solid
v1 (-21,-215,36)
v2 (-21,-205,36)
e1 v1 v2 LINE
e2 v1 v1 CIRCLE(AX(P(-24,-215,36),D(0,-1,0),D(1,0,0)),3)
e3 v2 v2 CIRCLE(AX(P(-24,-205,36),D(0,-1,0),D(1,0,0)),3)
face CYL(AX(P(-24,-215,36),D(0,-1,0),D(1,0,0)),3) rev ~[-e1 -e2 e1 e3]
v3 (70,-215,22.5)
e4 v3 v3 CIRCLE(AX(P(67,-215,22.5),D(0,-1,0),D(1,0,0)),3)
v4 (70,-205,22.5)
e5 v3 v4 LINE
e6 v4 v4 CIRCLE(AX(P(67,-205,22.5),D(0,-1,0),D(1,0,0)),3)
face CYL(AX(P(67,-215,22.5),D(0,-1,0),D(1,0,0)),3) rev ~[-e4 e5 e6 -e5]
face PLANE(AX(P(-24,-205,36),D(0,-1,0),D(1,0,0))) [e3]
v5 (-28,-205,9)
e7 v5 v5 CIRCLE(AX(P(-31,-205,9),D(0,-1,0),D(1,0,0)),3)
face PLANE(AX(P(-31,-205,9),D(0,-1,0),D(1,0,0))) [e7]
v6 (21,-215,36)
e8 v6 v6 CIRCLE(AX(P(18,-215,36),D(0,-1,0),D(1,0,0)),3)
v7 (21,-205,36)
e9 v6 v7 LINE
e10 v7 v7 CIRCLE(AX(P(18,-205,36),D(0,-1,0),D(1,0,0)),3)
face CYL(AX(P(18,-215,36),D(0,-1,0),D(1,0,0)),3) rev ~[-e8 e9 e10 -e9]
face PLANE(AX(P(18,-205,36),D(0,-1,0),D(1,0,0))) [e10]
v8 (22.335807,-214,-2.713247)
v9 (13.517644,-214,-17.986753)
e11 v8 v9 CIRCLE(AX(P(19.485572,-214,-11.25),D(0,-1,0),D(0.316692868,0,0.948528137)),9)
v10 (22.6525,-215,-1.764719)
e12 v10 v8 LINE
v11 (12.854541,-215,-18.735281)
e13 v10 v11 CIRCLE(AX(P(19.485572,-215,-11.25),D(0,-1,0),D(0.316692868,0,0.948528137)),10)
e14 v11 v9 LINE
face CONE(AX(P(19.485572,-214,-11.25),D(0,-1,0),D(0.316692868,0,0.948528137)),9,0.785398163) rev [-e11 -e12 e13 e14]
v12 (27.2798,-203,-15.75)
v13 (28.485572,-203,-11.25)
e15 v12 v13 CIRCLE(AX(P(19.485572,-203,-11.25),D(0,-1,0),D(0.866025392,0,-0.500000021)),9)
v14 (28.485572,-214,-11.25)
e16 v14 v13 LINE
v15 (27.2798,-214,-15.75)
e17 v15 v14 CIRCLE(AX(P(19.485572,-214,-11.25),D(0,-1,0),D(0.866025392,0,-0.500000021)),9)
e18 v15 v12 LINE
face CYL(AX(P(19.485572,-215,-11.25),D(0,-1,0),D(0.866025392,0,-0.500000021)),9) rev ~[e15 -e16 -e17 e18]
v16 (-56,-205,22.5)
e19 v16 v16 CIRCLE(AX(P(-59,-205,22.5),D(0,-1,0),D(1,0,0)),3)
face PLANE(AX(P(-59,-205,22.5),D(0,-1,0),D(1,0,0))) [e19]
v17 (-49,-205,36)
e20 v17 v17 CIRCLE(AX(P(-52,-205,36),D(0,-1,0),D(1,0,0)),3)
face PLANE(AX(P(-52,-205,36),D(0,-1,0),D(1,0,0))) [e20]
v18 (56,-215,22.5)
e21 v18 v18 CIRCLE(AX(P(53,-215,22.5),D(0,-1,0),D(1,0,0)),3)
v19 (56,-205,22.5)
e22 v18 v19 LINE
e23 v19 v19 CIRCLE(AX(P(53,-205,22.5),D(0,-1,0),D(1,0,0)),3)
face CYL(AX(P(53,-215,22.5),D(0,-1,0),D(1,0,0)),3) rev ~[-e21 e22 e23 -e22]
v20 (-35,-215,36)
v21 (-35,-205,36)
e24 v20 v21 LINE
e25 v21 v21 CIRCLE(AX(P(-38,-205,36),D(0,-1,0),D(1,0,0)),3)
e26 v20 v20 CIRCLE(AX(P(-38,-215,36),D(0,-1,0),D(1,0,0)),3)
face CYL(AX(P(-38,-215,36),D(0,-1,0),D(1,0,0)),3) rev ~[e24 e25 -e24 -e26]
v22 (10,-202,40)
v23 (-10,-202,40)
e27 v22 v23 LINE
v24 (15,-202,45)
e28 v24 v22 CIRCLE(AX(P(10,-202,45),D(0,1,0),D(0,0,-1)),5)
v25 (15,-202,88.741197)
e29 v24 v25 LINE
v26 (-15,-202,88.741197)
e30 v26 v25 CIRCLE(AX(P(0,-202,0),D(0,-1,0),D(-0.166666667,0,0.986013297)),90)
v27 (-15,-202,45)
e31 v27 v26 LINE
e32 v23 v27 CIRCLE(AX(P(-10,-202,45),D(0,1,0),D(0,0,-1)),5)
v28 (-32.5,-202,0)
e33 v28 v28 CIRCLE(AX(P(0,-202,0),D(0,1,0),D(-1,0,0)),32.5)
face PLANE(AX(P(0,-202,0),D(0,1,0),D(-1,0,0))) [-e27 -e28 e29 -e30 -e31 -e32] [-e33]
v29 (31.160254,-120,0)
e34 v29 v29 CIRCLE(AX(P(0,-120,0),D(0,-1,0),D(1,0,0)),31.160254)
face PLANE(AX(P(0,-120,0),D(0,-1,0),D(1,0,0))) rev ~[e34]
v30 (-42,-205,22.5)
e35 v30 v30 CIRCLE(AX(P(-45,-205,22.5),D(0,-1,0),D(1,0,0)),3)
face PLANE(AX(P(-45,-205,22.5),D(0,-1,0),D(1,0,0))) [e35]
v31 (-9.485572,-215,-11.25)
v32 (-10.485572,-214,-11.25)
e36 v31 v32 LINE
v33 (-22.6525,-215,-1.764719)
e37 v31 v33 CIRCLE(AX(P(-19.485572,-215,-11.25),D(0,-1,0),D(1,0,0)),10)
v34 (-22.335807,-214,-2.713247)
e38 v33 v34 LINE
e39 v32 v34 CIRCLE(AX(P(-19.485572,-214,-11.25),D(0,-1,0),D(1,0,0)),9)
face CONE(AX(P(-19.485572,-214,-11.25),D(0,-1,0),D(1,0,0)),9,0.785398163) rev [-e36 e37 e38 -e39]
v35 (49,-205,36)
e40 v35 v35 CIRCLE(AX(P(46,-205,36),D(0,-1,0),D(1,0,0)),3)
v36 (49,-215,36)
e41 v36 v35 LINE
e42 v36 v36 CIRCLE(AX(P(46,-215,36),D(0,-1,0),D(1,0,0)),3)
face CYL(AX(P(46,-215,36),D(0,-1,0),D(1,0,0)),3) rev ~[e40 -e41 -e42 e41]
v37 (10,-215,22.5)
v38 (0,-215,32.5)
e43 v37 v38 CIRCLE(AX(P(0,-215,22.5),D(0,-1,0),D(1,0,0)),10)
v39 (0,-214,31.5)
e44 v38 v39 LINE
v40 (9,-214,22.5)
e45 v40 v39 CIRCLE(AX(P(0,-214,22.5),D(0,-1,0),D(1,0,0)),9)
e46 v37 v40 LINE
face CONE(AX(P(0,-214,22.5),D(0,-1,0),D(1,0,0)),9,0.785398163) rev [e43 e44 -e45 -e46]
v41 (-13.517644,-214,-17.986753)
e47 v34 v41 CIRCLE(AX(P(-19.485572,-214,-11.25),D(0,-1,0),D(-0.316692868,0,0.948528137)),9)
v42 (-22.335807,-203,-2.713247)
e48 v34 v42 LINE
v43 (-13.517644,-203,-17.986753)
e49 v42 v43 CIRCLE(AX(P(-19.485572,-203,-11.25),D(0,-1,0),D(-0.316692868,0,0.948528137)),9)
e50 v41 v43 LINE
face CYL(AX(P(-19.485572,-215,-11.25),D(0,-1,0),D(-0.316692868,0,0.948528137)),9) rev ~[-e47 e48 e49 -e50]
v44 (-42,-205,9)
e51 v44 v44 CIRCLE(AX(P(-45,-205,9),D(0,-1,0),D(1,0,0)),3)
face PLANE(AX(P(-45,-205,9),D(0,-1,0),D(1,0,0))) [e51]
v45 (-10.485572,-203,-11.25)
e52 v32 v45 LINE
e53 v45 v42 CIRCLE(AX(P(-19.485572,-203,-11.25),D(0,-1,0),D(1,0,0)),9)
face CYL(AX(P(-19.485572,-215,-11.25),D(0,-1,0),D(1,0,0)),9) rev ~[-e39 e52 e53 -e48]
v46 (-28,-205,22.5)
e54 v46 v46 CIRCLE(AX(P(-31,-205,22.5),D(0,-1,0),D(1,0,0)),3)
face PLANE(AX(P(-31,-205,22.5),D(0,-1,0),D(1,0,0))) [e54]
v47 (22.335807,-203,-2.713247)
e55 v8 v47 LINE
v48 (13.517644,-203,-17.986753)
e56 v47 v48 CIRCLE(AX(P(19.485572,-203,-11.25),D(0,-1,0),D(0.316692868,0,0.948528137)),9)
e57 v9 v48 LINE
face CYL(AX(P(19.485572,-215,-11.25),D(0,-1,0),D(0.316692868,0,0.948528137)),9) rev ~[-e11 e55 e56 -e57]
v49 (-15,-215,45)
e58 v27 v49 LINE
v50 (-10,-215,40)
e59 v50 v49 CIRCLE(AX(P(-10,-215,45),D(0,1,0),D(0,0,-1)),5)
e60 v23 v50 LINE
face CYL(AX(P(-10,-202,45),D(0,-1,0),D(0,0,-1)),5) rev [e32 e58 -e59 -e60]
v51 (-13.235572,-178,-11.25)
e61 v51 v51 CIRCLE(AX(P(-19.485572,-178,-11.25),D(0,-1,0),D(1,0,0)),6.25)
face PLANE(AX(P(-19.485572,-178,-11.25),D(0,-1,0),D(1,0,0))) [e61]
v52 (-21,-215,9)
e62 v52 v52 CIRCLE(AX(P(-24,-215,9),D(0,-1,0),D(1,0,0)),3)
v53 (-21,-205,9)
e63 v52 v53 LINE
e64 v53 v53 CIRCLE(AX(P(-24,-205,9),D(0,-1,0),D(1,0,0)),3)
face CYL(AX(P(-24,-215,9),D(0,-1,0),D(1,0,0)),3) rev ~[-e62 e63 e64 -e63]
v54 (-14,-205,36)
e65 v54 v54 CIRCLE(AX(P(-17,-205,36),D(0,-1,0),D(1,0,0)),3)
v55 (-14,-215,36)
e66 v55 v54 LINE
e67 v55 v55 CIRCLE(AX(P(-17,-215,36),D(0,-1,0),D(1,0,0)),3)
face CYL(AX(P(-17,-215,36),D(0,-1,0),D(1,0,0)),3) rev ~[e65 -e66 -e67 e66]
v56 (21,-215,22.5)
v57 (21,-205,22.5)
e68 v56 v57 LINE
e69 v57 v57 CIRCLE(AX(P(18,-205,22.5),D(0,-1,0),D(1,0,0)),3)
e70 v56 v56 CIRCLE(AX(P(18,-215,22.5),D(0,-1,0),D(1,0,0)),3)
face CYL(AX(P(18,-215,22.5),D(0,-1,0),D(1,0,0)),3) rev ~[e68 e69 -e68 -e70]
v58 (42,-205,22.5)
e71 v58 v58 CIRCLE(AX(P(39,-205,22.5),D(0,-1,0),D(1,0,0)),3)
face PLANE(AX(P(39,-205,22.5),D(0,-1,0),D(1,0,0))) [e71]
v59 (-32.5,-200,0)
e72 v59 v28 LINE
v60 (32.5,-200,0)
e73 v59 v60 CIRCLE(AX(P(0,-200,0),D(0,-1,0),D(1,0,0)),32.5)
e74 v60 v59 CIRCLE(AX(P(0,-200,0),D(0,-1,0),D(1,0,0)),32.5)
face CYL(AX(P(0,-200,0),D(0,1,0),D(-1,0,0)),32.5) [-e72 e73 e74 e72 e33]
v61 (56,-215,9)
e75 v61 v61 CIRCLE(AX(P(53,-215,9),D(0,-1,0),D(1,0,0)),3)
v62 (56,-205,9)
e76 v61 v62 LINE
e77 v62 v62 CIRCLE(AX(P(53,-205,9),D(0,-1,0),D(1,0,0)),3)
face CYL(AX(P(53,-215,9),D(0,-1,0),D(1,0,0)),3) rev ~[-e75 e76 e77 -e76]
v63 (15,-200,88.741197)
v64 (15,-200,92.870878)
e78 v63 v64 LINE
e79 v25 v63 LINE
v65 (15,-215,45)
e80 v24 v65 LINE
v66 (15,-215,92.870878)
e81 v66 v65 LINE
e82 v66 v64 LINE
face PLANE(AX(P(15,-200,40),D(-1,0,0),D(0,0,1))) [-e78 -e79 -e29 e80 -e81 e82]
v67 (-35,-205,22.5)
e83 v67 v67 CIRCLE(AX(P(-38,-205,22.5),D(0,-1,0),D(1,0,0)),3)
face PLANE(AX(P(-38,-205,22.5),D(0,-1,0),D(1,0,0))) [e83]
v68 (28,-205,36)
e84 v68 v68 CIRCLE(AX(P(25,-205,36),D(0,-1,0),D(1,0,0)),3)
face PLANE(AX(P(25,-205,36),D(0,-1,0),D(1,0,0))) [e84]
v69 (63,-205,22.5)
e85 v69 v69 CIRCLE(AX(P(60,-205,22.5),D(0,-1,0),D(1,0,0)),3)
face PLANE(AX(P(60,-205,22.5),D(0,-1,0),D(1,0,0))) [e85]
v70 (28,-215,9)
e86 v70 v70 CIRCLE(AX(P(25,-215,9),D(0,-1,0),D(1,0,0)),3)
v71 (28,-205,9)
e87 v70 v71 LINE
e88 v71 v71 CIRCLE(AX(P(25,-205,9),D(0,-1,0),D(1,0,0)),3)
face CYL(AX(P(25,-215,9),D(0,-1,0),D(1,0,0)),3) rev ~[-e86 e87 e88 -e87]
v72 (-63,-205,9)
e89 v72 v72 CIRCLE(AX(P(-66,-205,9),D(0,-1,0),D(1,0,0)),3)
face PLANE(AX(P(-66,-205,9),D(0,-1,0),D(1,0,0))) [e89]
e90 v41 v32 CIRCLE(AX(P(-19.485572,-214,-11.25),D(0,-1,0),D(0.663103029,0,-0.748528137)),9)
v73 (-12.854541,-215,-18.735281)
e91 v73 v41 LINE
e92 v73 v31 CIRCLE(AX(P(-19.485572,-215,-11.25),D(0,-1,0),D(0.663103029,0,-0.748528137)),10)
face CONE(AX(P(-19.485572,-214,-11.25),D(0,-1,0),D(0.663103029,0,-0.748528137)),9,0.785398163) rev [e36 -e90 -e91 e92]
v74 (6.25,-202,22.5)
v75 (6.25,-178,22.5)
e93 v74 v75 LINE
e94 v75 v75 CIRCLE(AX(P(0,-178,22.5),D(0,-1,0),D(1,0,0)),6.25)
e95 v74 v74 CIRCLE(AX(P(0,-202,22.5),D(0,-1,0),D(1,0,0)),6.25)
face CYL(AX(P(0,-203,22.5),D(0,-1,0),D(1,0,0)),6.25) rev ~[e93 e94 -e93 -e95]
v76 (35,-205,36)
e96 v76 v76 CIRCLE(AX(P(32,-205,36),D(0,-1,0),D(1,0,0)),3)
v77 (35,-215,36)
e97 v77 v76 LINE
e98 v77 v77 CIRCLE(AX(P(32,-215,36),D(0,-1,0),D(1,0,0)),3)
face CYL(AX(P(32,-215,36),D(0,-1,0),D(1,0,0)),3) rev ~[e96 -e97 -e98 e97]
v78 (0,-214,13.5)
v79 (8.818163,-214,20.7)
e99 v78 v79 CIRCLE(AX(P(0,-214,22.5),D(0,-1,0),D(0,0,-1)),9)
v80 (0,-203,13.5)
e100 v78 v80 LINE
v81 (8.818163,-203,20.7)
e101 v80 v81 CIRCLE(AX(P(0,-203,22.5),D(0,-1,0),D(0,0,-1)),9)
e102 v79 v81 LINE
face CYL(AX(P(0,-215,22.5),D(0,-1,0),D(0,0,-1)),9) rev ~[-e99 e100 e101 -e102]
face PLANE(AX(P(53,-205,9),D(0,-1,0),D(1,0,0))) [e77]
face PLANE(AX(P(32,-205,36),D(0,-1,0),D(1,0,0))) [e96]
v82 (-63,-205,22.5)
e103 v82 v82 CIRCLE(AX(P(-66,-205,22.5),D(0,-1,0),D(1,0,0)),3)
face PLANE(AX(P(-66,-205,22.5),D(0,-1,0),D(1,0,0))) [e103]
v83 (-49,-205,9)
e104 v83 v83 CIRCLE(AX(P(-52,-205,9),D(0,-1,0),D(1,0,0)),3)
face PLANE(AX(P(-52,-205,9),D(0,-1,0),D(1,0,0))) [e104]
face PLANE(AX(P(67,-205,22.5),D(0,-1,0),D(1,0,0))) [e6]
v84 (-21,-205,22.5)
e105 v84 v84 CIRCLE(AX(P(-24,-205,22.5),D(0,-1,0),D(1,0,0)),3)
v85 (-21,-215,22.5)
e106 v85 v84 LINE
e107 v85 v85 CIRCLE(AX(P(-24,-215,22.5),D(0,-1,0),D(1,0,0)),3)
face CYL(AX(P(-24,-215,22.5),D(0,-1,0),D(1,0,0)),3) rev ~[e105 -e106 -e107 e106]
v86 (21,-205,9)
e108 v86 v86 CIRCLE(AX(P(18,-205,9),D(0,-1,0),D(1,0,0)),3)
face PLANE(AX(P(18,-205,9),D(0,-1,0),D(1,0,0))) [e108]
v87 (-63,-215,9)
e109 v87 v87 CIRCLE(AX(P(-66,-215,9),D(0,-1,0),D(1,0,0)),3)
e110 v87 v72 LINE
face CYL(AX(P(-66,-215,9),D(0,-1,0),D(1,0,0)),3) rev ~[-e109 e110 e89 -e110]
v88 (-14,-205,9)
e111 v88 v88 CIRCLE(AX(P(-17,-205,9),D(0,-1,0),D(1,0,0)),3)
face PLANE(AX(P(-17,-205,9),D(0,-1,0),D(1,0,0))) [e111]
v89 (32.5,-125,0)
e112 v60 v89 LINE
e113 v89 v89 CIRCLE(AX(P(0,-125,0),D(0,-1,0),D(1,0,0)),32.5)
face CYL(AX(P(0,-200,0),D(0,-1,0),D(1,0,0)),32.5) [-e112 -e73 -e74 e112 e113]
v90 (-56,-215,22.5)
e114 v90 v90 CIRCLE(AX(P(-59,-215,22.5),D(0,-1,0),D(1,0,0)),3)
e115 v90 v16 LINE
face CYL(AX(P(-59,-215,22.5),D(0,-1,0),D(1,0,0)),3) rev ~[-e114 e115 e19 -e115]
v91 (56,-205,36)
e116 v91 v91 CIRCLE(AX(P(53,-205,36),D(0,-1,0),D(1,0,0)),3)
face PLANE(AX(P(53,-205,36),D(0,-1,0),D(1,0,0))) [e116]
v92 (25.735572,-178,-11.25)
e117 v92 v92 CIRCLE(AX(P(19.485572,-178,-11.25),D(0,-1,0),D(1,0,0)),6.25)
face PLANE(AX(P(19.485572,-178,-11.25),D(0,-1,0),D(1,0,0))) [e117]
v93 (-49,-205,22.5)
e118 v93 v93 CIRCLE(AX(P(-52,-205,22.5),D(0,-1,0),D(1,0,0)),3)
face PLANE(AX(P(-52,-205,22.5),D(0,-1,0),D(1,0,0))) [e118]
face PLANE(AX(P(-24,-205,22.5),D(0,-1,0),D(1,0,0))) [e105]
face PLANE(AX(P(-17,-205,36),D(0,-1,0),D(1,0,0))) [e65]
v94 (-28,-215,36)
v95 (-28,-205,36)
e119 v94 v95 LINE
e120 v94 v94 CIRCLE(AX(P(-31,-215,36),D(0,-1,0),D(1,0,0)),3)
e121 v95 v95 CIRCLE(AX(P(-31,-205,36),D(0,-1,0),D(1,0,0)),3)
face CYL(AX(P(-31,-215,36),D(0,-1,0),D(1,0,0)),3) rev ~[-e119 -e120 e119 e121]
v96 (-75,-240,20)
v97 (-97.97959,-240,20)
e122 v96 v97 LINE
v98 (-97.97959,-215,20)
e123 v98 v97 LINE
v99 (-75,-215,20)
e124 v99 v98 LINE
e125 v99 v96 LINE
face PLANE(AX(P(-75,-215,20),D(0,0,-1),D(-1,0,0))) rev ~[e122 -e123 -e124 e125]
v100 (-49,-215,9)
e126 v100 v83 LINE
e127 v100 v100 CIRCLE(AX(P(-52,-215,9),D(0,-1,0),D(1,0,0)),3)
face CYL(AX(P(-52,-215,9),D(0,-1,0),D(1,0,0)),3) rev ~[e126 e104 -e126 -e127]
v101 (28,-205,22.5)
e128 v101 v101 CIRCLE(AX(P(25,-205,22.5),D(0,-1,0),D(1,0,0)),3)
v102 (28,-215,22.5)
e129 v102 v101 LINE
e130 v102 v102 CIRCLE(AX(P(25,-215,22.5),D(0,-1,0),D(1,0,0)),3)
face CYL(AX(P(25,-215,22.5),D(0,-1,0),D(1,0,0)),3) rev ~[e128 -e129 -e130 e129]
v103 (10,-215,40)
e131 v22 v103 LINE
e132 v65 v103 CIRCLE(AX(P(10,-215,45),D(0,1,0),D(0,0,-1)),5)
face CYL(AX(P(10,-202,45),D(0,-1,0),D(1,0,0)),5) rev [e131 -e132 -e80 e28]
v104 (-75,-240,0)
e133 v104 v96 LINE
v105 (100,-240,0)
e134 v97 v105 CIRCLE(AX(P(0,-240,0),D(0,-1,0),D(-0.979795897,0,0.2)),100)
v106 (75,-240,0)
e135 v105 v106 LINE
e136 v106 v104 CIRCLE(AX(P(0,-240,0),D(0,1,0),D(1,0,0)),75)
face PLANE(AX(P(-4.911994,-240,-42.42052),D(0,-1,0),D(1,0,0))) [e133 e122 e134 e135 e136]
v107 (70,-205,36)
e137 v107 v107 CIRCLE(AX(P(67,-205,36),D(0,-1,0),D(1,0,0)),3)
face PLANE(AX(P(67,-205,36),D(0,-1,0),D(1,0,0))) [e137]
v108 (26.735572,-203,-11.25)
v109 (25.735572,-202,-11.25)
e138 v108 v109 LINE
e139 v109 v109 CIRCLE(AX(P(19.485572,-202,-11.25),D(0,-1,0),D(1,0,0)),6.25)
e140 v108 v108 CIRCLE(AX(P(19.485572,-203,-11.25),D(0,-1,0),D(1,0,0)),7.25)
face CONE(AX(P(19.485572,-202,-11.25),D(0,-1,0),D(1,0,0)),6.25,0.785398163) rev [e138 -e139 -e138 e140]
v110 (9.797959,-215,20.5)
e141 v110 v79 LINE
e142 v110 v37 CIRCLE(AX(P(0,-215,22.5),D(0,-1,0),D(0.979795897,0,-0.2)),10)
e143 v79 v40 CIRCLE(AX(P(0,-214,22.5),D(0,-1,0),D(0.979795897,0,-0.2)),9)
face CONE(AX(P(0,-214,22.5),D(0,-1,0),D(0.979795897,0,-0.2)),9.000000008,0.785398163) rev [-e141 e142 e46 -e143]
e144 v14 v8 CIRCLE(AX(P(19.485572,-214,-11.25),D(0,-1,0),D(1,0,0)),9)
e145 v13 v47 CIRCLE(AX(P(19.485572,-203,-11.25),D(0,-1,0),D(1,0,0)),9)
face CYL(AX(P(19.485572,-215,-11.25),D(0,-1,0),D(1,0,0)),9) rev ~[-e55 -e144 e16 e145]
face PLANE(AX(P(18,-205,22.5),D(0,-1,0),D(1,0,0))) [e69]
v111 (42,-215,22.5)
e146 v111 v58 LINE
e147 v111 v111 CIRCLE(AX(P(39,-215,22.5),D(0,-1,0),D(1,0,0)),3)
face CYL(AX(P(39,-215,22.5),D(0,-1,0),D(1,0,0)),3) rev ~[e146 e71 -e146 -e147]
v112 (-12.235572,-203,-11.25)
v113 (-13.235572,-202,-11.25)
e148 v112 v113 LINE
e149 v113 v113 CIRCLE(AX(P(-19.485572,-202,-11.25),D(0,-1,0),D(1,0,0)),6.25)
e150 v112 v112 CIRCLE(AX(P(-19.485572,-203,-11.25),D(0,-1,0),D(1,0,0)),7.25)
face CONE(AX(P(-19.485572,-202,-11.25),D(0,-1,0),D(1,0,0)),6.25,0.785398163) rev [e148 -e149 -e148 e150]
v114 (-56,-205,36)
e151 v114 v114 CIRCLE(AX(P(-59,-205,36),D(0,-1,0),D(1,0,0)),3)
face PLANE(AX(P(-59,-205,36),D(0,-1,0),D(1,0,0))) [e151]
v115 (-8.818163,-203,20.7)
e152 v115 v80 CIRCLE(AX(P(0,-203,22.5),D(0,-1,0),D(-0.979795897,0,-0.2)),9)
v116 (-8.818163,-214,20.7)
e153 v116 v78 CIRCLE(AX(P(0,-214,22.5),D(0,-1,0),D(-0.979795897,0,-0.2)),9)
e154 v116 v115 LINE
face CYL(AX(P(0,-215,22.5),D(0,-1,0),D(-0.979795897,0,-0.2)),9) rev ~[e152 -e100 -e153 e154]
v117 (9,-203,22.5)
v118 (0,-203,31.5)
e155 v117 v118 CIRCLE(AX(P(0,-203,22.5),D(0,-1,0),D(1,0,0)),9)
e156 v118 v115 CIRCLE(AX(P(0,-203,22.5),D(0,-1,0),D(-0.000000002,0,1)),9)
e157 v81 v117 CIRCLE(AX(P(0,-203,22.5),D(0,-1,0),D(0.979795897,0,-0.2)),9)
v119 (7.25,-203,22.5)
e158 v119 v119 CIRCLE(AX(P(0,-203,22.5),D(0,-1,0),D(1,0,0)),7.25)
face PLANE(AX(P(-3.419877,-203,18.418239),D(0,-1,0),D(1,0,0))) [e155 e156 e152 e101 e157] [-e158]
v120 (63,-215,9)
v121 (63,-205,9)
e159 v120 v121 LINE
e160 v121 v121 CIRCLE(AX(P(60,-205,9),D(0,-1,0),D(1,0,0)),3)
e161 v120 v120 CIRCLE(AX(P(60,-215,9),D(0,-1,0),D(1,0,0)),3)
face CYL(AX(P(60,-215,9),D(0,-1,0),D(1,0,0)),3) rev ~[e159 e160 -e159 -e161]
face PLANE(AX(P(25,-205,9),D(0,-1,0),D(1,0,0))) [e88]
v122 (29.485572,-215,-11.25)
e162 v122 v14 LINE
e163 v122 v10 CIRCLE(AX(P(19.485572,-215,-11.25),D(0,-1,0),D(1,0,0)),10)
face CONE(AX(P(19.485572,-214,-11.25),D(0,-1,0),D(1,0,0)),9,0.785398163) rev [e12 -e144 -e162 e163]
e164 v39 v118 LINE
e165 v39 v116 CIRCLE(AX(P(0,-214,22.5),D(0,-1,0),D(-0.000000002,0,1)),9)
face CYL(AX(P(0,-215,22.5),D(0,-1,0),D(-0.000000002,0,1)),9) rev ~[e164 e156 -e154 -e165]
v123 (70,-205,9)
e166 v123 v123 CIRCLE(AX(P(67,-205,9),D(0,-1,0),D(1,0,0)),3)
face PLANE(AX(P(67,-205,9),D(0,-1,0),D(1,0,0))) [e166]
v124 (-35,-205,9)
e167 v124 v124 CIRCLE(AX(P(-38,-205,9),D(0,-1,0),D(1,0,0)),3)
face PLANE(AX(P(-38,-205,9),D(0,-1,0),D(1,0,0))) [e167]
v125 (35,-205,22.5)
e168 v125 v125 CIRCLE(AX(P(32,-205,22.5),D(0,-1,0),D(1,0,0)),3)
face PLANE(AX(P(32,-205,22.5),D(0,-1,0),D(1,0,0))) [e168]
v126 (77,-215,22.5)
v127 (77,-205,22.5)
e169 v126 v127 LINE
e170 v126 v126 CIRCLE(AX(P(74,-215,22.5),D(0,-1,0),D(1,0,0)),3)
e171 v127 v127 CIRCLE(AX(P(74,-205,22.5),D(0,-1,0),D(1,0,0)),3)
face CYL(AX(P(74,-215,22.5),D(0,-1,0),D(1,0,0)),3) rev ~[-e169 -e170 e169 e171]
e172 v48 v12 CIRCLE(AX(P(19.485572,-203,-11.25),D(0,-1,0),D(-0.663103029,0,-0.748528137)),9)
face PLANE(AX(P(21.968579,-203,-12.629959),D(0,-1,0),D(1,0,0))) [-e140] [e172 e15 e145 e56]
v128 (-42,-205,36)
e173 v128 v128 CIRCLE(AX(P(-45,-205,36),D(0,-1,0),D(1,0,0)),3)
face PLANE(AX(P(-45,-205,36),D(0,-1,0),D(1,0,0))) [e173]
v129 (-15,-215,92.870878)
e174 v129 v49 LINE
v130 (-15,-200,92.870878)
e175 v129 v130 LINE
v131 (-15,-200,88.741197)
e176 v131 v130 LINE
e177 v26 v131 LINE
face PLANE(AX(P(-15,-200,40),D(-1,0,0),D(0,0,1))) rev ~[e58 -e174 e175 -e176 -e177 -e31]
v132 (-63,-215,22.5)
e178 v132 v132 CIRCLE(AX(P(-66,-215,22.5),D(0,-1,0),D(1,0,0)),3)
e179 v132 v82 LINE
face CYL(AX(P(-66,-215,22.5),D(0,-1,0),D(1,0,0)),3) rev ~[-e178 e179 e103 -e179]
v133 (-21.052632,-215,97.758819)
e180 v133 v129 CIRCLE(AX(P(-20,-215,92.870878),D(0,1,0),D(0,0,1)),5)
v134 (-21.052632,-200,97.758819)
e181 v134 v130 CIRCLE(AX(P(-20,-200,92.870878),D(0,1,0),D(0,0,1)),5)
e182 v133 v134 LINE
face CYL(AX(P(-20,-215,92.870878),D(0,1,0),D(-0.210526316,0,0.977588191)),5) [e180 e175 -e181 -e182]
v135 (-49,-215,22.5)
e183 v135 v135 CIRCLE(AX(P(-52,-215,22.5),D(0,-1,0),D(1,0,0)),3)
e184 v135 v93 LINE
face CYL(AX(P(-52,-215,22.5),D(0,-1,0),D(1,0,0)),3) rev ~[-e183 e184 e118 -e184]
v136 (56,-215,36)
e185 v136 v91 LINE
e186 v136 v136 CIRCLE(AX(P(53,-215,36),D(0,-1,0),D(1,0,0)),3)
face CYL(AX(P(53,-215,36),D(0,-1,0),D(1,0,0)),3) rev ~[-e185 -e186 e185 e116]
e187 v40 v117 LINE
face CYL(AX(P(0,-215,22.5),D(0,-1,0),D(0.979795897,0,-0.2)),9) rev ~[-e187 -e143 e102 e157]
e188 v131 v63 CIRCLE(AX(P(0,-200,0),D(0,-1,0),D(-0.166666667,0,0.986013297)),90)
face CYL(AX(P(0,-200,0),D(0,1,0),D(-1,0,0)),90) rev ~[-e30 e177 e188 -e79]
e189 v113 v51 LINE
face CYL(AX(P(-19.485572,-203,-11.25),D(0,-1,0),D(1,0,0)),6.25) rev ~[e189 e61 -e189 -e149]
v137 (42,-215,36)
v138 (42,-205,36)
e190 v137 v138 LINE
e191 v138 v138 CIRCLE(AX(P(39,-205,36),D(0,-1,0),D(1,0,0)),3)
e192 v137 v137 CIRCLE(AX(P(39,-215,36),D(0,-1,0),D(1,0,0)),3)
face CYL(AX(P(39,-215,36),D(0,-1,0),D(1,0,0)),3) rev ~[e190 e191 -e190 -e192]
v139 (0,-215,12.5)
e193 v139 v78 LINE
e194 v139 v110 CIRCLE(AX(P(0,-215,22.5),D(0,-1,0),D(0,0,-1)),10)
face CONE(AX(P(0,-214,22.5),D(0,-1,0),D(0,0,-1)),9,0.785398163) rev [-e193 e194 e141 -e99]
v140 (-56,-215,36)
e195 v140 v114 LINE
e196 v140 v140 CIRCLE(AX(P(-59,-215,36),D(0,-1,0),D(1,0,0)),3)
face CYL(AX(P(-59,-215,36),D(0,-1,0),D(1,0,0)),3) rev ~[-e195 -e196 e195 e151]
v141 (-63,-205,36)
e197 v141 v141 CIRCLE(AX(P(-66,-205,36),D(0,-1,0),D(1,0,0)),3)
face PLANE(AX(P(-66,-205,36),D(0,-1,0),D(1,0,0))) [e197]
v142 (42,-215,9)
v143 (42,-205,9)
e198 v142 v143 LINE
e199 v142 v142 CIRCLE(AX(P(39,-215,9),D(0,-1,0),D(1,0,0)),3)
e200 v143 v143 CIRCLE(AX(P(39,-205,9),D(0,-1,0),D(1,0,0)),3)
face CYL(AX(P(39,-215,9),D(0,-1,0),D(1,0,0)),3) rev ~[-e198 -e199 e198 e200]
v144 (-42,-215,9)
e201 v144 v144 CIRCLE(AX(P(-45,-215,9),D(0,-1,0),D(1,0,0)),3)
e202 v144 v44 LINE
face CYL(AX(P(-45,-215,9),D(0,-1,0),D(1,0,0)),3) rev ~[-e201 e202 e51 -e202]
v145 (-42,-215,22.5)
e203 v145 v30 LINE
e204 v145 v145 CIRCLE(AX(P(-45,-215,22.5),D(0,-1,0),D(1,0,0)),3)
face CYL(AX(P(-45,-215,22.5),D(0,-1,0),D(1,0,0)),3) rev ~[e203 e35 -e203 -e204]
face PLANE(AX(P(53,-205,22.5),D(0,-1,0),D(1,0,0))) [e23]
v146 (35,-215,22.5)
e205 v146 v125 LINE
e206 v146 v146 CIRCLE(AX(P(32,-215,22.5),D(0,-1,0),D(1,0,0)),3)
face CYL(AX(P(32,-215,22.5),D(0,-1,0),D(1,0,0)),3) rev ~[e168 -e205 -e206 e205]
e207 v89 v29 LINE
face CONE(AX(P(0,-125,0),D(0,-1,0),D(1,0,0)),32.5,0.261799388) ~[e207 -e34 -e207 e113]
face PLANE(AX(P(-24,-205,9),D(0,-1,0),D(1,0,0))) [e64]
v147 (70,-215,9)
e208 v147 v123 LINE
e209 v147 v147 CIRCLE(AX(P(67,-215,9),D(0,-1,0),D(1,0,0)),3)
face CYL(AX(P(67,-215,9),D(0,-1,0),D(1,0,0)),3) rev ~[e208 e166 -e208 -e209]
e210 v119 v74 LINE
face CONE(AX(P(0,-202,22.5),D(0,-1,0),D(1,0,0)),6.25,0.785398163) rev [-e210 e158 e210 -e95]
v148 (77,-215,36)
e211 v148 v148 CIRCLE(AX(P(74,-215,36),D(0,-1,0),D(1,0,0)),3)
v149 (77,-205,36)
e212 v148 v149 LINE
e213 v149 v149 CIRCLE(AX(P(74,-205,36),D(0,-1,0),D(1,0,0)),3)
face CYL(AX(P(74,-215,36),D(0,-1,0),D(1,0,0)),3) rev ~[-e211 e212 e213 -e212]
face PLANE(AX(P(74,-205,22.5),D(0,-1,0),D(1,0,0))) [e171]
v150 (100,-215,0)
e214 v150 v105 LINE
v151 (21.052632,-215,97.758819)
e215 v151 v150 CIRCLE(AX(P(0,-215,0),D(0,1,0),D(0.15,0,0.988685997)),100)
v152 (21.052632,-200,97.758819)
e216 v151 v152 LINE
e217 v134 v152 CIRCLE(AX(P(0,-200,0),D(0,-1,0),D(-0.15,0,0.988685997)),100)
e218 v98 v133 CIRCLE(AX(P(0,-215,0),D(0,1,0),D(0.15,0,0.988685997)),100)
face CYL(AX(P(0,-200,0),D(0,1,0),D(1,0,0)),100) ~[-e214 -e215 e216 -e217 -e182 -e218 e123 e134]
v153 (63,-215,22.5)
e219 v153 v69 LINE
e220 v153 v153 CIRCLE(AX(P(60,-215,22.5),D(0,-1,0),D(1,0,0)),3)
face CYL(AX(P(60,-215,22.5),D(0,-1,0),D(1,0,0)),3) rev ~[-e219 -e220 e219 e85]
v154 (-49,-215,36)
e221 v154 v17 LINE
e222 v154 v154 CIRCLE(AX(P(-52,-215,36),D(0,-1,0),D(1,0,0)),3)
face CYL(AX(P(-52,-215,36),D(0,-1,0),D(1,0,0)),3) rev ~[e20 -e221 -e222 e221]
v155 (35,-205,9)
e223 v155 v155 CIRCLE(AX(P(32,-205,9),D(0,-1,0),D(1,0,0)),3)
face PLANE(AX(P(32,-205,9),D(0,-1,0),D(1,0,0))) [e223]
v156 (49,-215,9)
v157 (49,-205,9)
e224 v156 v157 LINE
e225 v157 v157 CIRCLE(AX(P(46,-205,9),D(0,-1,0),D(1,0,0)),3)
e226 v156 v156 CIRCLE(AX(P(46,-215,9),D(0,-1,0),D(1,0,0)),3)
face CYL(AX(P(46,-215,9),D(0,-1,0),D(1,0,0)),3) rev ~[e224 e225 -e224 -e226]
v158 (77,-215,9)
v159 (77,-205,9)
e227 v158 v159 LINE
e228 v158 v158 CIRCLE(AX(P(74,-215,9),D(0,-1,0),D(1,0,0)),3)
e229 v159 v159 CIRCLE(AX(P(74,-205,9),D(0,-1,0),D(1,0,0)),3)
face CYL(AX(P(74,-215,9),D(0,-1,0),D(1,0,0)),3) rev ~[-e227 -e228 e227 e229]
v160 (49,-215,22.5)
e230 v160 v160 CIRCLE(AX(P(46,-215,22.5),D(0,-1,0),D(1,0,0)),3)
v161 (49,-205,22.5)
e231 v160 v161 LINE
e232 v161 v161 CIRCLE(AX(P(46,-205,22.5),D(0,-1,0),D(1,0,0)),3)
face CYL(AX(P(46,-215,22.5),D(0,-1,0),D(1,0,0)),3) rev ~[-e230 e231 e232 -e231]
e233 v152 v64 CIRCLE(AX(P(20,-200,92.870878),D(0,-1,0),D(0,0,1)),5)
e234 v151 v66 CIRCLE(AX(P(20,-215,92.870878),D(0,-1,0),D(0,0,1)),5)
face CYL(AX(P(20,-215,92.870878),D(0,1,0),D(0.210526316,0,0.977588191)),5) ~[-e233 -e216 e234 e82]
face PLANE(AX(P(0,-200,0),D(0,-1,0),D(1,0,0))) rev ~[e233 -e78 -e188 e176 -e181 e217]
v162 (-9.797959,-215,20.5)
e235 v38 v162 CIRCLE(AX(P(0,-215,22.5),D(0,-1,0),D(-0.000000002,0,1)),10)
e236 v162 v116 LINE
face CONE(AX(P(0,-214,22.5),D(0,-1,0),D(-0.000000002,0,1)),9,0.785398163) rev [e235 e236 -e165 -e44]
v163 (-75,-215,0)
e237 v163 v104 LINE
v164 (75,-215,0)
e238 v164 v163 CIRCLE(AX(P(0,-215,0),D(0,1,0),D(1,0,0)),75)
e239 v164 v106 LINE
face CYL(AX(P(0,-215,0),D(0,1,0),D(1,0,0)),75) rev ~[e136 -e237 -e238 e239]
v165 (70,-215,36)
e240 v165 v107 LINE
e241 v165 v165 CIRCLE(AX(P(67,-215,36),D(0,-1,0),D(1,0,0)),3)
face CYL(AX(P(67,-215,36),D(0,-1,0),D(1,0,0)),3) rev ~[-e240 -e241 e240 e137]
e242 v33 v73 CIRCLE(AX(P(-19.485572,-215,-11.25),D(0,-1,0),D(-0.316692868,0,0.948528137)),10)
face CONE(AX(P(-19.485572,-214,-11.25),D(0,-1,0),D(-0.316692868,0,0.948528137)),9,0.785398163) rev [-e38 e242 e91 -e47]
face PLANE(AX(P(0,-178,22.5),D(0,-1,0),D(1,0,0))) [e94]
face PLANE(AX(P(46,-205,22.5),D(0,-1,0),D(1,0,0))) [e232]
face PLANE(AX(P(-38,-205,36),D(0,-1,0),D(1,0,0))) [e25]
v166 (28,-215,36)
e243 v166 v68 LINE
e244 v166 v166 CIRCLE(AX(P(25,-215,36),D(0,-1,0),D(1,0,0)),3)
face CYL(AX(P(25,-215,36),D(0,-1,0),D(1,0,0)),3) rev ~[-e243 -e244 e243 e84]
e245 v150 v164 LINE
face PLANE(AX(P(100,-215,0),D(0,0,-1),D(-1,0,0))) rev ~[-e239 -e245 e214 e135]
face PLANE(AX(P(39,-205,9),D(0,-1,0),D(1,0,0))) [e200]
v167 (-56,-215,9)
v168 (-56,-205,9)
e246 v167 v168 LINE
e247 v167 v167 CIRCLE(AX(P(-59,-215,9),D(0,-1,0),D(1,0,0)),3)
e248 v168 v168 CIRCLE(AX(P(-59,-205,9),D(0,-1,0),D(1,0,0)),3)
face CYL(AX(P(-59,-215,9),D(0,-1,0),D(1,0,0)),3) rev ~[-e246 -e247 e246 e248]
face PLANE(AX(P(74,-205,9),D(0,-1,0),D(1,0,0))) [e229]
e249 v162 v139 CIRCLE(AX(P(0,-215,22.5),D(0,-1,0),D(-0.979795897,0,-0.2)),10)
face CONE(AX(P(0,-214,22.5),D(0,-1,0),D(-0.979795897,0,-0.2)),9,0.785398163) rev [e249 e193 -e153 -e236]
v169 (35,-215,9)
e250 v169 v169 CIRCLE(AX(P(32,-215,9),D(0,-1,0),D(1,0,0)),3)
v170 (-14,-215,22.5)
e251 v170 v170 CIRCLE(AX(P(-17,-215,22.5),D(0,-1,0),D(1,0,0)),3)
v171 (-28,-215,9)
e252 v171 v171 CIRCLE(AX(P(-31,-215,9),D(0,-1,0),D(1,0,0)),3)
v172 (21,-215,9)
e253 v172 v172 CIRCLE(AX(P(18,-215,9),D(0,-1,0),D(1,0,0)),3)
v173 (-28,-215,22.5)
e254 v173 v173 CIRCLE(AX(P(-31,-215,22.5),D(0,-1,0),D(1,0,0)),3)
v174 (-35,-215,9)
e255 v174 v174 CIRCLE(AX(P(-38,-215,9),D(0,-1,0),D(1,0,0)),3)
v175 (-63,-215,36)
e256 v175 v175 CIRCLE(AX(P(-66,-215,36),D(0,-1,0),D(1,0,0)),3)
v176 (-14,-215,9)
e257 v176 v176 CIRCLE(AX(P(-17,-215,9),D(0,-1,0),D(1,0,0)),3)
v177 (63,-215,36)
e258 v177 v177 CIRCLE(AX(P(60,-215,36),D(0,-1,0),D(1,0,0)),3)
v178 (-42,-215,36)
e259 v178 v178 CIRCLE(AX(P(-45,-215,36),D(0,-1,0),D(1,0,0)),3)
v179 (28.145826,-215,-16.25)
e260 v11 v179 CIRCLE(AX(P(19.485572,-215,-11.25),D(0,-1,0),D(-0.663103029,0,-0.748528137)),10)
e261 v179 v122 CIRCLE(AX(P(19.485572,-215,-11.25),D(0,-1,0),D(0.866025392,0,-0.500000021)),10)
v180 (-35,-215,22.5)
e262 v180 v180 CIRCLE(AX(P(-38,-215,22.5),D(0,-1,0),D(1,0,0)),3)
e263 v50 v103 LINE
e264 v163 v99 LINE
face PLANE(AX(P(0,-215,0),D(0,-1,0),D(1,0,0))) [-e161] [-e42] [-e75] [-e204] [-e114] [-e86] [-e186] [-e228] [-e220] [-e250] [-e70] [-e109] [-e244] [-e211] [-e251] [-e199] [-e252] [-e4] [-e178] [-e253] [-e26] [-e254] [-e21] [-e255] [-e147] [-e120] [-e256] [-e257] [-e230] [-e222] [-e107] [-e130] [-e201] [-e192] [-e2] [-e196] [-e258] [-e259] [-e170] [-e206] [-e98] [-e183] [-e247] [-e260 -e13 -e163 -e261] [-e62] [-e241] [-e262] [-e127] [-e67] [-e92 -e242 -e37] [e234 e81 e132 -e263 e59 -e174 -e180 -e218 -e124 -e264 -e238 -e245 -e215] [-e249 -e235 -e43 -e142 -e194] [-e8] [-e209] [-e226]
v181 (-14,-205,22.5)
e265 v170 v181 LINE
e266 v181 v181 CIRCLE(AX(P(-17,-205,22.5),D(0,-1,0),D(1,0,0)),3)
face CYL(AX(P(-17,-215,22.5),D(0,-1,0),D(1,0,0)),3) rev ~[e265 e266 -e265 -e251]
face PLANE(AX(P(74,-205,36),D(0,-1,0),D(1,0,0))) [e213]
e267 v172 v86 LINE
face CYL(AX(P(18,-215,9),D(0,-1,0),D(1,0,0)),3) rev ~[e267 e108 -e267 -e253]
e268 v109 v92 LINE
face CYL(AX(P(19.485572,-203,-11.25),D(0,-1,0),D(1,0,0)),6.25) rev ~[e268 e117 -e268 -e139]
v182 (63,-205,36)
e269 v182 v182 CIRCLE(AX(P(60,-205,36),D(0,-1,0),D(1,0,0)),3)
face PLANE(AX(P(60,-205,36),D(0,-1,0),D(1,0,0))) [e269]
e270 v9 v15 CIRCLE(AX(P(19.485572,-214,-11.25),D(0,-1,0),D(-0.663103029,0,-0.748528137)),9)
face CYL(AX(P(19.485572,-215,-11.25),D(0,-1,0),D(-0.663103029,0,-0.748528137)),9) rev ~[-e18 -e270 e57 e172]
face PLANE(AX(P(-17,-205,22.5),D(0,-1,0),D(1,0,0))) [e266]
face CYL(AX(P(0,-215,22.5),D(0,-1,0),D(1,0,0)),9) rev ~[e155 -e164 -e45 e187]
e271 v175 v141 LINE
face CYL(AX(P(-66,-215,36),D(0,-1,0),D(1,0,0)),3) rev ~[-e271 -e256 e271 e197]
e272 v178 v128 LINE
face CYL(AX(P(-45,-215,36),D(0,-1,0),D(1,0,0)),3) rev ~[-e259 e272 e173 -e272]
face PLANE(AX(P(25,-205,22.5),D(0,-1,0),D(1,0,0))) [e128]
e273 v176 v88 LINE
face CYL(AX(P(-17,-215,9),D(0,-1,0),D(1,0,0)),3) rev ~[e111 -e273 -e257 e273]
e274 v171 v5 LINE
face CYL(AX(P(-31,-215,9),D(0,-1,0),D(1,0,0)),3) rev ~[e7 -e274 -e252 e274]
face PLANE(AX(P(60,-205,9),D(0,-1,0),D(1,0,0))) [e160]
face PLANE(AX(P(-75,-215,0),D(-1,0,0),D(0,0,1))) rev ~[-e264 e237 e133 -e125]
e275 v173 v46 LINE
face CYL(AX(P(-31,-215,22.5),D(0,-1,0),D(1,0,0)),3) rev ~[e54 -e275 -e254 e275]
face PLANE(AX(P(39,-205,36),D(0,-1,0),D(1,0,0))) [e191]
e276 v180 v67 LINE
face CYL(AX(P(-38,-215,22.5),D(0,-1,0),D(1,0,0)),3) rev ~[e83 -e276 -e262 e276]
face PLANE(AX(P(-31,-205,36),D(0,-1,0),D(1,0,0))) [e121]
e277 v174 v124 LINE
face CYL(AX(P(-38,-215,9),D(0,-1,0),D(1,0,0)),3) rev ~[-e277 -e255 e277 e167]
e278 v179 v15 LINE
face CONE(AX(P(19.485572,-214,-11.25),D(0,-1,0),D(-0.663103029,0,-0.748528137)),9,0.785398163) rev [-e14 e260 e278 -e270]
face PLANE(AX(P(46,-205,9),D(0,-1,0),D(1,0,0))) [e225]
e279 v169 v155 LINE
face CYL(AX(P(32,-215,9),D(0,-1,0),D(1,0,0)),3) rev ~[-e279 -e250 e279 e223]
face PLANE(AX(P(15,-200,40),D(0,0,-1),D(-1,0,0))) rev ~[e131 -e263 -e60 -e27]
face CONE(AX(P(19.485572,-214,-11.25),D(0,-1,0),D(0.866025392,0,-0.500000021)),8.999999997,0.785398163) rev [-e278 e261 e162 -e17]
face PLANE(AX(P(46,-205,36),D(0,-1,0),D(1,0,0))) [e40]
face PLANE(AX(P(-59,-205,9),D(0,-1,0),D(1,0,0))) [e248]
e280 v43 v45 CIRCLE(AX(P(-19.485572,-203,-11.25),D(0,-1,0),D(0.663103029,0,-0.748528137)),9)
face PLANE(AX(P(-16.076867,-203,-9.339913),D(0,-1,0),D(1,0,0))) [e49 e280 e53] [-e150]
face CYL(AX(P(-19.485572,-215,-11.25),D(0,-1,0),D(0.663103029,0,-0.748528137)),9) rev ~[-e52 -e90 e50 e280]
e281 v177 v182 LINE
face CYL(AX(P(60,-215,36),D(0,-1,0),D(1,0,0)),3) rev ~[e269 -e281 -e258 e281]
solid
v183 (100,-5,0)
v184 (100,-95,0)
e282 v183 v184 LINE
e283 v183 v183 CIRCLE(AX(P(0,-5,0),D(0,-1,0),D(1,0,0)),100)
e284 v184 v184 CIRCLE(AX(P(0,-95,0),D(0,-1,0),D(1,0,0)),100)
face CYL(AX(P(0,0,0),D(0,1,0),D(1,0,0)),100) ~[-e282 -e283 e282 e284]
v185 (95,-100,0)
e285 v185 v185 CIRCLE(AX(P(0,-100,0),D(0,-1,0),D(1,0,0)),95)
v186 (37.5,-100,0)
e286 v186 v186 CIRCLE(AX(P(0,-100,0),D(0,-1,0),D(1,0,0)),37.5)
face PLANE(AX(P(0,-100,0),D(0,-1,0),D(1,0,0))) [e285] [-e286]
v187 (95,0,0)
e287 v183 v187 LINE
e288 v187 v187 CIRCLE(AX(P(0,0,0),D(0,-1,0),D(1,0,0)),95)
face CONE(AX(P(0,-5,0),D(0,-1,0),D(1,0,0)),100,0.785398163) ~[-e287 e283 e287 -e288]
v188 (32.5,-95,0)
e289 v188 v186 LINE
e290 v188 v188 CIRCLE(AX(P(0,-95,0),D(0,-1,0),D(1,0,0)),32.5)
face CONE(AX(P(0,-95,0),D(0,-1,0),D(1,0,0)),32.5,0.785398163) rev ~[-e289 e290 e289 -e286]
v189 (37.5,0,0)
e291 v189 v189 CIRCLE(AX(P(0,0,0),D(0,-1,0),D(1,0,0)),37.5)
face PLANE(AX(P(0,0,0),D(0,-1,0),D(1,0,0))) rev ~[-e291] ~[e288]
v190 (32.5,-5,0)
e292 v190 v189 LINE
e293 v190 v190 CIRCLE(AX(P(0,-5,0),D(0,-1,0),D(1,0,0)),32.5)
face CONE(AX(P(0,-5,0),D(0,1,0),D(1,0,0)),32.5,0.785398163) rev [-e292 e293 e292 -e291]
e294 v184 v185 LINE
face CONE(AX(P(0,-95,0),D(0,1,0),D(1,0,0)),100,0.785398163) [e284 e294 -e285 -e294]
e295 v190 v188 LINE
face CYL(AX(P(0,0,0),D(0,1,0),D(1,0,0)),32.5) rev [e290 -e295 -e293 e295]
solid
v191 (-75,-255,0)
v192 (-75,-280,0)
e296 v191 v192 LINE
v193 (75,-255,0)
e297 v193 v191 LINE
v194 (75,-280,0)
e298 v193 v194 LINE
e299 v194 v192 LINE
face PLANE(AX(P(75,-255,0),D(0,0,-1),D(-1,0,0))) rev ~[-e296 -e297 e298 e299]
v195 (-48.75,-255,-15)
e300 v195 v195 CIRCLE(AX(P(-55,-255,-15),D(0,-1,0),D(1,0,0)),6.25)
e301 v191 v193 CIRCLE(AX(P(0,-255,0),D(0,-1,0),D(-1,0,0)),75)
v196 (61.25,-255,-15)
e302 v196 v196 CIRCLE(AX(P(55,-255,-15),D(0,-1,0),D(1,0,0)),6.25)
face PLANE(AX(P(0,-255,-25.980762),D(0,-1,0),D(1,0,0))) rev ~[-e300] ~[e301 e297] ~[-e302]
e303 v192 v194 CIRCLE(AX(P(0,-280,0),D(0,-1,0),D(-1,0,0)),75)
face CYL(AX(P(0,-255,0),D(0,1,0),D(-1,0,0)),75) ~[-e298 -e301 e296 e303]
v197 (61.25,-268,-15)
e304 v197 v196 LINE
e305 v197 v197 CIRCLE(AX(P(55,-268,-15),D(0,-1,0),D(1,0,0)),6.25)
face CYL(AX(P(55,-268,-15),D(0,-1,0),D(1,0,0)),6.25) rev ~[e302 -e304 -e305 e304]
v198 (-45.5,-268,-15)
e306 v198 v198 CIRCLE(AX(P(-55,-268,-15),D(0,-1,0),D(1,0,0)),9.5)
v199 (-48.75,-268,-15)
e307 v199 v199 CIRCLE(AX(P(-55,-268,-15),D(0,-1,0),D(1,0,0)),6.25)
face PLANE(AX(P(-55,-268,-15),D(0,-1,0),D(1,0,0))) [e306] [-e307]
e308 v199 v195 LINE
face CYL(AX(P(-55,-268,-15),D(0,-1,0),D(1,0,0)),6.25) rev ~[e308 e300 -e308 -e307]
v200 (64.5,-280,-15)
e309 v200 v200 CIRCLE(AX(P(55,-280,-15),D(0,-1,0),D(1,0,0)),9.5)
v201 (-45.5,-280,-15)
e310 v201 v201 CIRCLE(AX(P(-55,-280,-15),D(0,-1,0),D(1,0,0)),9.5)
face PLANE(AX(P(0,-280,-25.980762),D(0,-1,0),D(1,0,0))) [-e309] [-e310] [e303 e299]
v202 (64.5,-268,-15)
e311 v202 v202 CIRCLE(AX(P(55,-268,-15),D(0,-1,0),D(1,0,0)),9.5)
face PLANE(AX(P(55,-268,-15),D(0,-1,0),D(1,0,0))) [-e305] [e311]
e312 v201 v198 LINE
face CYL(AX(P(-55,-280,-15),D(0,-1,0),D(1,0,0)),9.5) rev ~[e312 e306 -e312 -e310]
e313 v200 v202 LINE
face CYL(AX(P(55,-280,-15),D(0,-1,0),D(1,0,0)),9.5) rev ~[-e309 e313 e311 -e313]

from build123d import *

# Parameters (mm, degrees)
F0_R      = 100
F0_R_2    = 32.5
F1_DEPTH  = 100
F2_SIZE   = 5
F4_R      = 32.5
F5_DEPTH  = 80
F6_SIZE2  = 1.3397459622
F6_SIZE   = 5
F7_R      = 100
F8_DEPTH  = 15
F9_R      = 90
F9_R_2    = 32.5
F10_DEPTH = 2
F11_W     = 15
F11_H     = 60
F12_DEPTH = 25
F13_R     = 5
F15_DEPTH = 12
F16_R     = 6.25
F17_DEPTH = 25
F18_SIZE  = 1
F20_DEPTH = 25
F23_DEPTH = 25
F24_R     = 9.5
F24_R_2   = 6.25
F25_DEPTH = 12
F26_R     = 6.25
F27_DEPTH = 15
F28_R     = 3
F29_DEPTH = 10


# Not quite as in the source:
# - a feature names something its author has since deleted; it is built from what else it names


with BuildPart() as f1:
    # F0 (on Front) → F1 (new body)
    with BuildSketch(Plane.XZ):
        Circle(F0_R)
        Circle(F0_R_2, mode=Mode.SUBTRACT)
    extrude(amount=F1_DEPTH)

    # F2
    f2_edges = [f1.edges().sort_by_distance(p)[0] for p in [
        (-32.5, -100, 0),
        (-100, -100, 0),
        (-100, 0, 0),
        (-32.5, 0, 0),
    ]]
    chamfer(f2_edges, length=F2_SIZE)


with BuildPart() as f5:
    # F4 (on offset) → F5 (new body)
    with BuildSketch(Plane.XZ.offset(200)):
        Circle(F4_R)
    extrude(amount=-F5_DEPTH)

    # F6
    f6_edges = [f5.edges().sort_by_distance(p)[0] for p in [
        (-32.5, -120, 0),
    ]]
    f6_side = f5.faces().sort_by_distance((-32.5, -160, 0))[0]
    chamfer(f6_edges, length=F6_SIZE, length2=F6_SIZE2, reference=f6_side)

    # F7 (on face) → F8 (join)
    with BuildSketch(Plane.XZ.offset(200)):
        Circle(F7_R)
    extrude(amount=F8_DEPTH)

    # F9 (on face) → F10 (cut)
    with BuildSketch(Plane(origin=(0, -200, 0), x_dir=(-1, 0, 0), z_dir=(0, 1, 0))):
        Circle(F9_R)
        Circle(F9_R_2, mode=Mode.SUBTRACT)
    extrude(amount=-F10_DEPTH, mode=Mode.SUBTRACT)

    # F11 (on face) → F12 (cut)
    with BuildSketch(Plane(origin=(0, -200, 0), x_dir=(-1, 0, 0), z_dir=(0, 1, 0))):
        with Locations((-7.5, 70)):
            Rectangle(F11_W, F11_H)
        with Locations((7.5, 70)):
            Rectangle(F11_W, F11_H)
    extrude(amount=-F12_DEPTH, mode=Mode.SUBTRACT)

    # F13
    f13_edges = [f5.edges().sort_by_distance(p)[0] for p in [
        (-15, -208.5, 40),
        (15, -208.5, 40),
        (15, -207.5, 98.8686),
        (-15, -207.5, 98.8686),
    ]]
    fillet(f13_edges, radius=F13_R)

    # F14 (on face) → F15 (cut)
    with BuildSketch(Plane.XZ.offset(215)):
        with BuildLine():
            Line((0, 13.5), (0, 22.5))
            ThreePointArc((0, 22.5), (-4.5, 22.045407685), (-8.818163074, 20.7))
            ThreePointArc((-8.818163074, 20.7), (-5.6920997883, 15.5286299768), (0, 13.5))
        make_face()
        with BuildLine():
            ThreePointArc((0, 13.5), (5.6920997883, 15.5286299768), (8.818163074, 20.7))
            ThreePointArc((8.818163074, 20.7), (4.5, 22.045407685), (0, 22.5))
            Line((0, 22.5), (0, 13.5))
        make_face()
        with BuildLine():
            ThreePointArc((0, 22.5), (4.5, 22.045407685), (8.818163074, 20.7))
            ThreePointArc((8.818163074, 20.7), (8.954425377, 21.595419342), (9, 22.5))
            ThreePointArc((9, 22.5), (6.3639610242, 28.8639610372), (-1.84e-08, 31.5))
            ThreePointArc((-1.84e-08, 31.5), (-6.971370029, 28.1920997812), (-8.818163074, 20.7))
            ThreePointArc((-8.818163074, 20.7), (-4.5, 22.045407685), (0, 22.5))
        make_face()
        with BuildLine():
            ThreePointArc((-22.3358073953, -2.7132467632), (-19.4855715851, -11.25), (-13.5176443213, -17.9867532368))
            ThreePointArc((-13.5176443213, -17.9867532368), (-11.2785214033, -14.9438228589), (-10.4855715851, -11.25))
            ThreePointArc((-10.4855715851, -11.25), (-14.224969067, -3.9475304762), (-22.3358073953, -2.7132467632))
        make_face()
        with BuildLine():
            ThreePointArc((-27.2798001221, -15.7500001682), (-20.9293894952, -20.133433449), (-13.5176443213, -17.9867532368))
            ThreePointArc((-13.5176443213, -17.9867532368), (-19.4855715851, -11.25), (-22.3358073953, -2.7132467632))
            ThreePointArc((-22.3358073953, -2.7132467632), (-27.9007596487, -8.0586664457), (-27.2798001221, -15.7500001682))
        make_face()
        with BuildLine():
            ThreePointArc((28.4855715851, -11.25), (26.7880411089, -5.9893974818), (22.3358073953, -2.7132467632))
            ThreePointArc((22.3358073953, -2.7132467632), (19.4855715851, -11.25), (13.5176443213, -17.9867532368))
            ThreePointArc((13.5176443213, -17.9867532368), (20.9293894839, -20.1334334508), (27.2798001106, -15.750000188))
            ThreePointArc((27.2798001106, -15.750000188), (28.1789039937, -13.5793715108), (28.4855715851, -11.25))
        make_face()
        with BuildLine():
            ThreePointArc((13.5176443213, -17.9867532368), (19.4855715851, -11.25), (22.3358073953, -2.7132467632))
            ThreePointArc((22.3358073953, -2.7132467632), (11.6913429511, -6.75), (13.5176443213, -17.9867532368))
        make_face()
    extrude(amount=-F15_DEPTH, mode=Mode.SUBTRACT)

    # F16 (on face) → F17 (cut)
    with BuildSketch(Plane.XZ.offset(203)):
        with Locations((0, 22.5)):
            Circle(F16_R)
        with Locations((19.4855715851, -11.25)):
            Circle(F16_R)
        with Locations((-19.4855715851, -11.25)):
            Circle(F16_R)
    extrude(amount=-F17_DEPTH, mode=Mode.SUBTRACT)

    # F18
    f18_edges = [f5.edges().sort_by_distance(p)[0] for p in [
        (-8.818163, -215, 24.3),
        (-6.25, -203, 22.5),
        (16.635336, -215, -19.786753),
        (13.235572, -203, -11.25),
        (-25.735572, -203, -11.25),
        (-16.635336, -215, -19.786753),
    ]]
    chamfer(f18_edges, length=F18_SIZE)

    # F19 (on face) → F20 (join)
    with BuildSketch(Plane.XZ.offset(215)):
        with BuildLine():
            ThreePointArc((75, 0), (0, -75), (-75, 0))
            Line((-75, 0), (-75, 20))
            Line((-75, 20), (-97.9795897113, 20))
            ThreePointArc((-97.9795897113, 20), (-10.0508962005, -99.4936153005), (100, 0))
            Line((100, 0), (75, 0))
        make_face()
    extrude(amount=F20_DEPTH)

    # F28 (on face) → F29 (cut)
    with BuildSketch(Plane.XZ.offset(215)):
        with Locations((74, 9)):
            Circle(F28_R)
        with Locations((67, 9)):
            Circle(F28_R)
        with Locations((60, 9)):
            Circle(F28_R)
        with Locations((53, 9)):
            Circle(F28_R)
        with Locations((46, 9)):
            Circle(F28_R)
        with Locations((39, 9)):
            Circle(F28_R)
        with Locations((32, 9)):
            Circle(F28_R)
        with Locations((25, 9)):
            Circle(F28_R)
        with Locations((18, 9)):
            Circle(F28_R)
        with Locations((-17, 9)):
            Circle(F28_R)
        with Locations((-24, 9)):
            Circle(F28_R)
        with Locations((-31, 9)):
            Circle(F28_R)
        with Locations((-38, 9)):
            Circle(F28_R)
        with Locations((74, 36)):
            Circle(F28_R)
        with Locations((67, 36)):
            Circle(F28_R)
        with Locations((60, 36)):
            Circle(F28_R)
        with Locations((53, 36)):
            Circle(F28_R)
        with Locations((39, 36)):
            Circle(F28_R)
        with Locations((32, 36)):
            Circle(F28_R)
        with Locations((25, 36)):
            Circle(F28_R)
        with Locations((-17, 36)):
            Circle(F28_R)
        with Locations((-45, 9)):
            Circle(F28_R)
        with Locations((-52, 9)):
            Circle(F28_R)
        with Locations((-59, 36)):
            Circle(F28_R)
        with Locations((-38, 36)):
            Circle(F28_R)
        with Locations((-31, 36)):
            Circle(F28_R)
        with Locations((46, 36)):
            Circle(F28_R)
        with Locations((18, 36)):
            Circle(F28_R)
        with Locations((-24, 36)):
            Circle(F28_R)
        with Locations((-52, 36)):
            Circle(F28_R)
        with Locations((-66, 36)):
            Circle(F28_R)
        with Locations((-45, 36)):
            Circle(F28_R)
        with Locations((-59, 9)):
            Circle(F28_R)
        with Locations((-66, 9)):
            Circle(F28_R)
        with Locations((-52, 22.5)):
            Circle(F28_R)
        with Locations((-45, 22.5)):
            Circle(F28_R)
        with Locations((-38, 22.5)):
            Circle(F28_R)
        with Locations((-31, 22.5)):
            Circle(F28_R)
        with Locations((-24, 22.5)):
            Circle(F28_R)
        with Locations((-17, 22.5)):
            Circle(F28_R)
        with Locations((18, 22.5)):
            Circle(F28_R)
        with Locations((25, 22.5)):
            Circle(F28_R)
        with Locations((32, 22.5)):
            Circle(F28_R)
        with Locations((39, 22.5)):
            Circle(F28_R)
        with Locations((46, 22.5)):
            Circle(F28_R)
        with Locations((53, 22.5)):
            Circle(F28_R)
        with Locations((60, 22.5)):
            Circle(F28_R)
        with Locations((67, 22.5)):
            Circle(F28_R)
        with Locations((74, 22.5)):
            Circle(F28_R)
        with Locations((-59, 22.5)):
            Circle(F28_R)
        with Locations((-66, 22.5)):
            Circle(F28_R)
    extrude(amount=-F29_DEPTH, mode=Mode.SUBTRACT)


with BuildPart() as f23:
    # F22 (on offset) → F23 (new body)
    with BuildSketch(Plane.XZ.offset(255)):
        with BuildLine():
            Line((75, 0), (-75, 0))
            ThreePointArc((-75, 0), (0, -75), (75, 0))
        make_face()
    extrude(amount=F23_DEPTH)

    # F24 (on face) → F25 (cut)
    with BuildSketch(Plane.XZ.offset(280)):
        with Locations((-55, -15)):
            Circle(F24_R)
        with Locations((-55, -15)):
            Circle(F24_R_2, mode=Mode.SUBTRACT)
        with Locations((55, -15)):
            Circle(F24_R)
        with Locations((55, -15)):
            Circle(F24_R_2, mode=Mode.SUBTRACT)
        with Locations((-55, -15)):
            Circle(F24_R_2)
        with Locations((55, -15)):
            Circle(F24_R_2)
    extrude(amount=-F25_DEPTH, mode=Mode.SUBTRACT)

    # F26 (on face) → F27 (cut)
    with BuildSketch(Plane.XZ.offset(268)):
        with Locations((-55, -15)):
            Circle(F26_R)
        with Locations((55, -15)):
            Circle(F26_R)
    extrude(amount=-F27_DEPTH, mode=Mode.SUBTRACT)


solid = Compound([f1.part, f5.part, f23.part])
